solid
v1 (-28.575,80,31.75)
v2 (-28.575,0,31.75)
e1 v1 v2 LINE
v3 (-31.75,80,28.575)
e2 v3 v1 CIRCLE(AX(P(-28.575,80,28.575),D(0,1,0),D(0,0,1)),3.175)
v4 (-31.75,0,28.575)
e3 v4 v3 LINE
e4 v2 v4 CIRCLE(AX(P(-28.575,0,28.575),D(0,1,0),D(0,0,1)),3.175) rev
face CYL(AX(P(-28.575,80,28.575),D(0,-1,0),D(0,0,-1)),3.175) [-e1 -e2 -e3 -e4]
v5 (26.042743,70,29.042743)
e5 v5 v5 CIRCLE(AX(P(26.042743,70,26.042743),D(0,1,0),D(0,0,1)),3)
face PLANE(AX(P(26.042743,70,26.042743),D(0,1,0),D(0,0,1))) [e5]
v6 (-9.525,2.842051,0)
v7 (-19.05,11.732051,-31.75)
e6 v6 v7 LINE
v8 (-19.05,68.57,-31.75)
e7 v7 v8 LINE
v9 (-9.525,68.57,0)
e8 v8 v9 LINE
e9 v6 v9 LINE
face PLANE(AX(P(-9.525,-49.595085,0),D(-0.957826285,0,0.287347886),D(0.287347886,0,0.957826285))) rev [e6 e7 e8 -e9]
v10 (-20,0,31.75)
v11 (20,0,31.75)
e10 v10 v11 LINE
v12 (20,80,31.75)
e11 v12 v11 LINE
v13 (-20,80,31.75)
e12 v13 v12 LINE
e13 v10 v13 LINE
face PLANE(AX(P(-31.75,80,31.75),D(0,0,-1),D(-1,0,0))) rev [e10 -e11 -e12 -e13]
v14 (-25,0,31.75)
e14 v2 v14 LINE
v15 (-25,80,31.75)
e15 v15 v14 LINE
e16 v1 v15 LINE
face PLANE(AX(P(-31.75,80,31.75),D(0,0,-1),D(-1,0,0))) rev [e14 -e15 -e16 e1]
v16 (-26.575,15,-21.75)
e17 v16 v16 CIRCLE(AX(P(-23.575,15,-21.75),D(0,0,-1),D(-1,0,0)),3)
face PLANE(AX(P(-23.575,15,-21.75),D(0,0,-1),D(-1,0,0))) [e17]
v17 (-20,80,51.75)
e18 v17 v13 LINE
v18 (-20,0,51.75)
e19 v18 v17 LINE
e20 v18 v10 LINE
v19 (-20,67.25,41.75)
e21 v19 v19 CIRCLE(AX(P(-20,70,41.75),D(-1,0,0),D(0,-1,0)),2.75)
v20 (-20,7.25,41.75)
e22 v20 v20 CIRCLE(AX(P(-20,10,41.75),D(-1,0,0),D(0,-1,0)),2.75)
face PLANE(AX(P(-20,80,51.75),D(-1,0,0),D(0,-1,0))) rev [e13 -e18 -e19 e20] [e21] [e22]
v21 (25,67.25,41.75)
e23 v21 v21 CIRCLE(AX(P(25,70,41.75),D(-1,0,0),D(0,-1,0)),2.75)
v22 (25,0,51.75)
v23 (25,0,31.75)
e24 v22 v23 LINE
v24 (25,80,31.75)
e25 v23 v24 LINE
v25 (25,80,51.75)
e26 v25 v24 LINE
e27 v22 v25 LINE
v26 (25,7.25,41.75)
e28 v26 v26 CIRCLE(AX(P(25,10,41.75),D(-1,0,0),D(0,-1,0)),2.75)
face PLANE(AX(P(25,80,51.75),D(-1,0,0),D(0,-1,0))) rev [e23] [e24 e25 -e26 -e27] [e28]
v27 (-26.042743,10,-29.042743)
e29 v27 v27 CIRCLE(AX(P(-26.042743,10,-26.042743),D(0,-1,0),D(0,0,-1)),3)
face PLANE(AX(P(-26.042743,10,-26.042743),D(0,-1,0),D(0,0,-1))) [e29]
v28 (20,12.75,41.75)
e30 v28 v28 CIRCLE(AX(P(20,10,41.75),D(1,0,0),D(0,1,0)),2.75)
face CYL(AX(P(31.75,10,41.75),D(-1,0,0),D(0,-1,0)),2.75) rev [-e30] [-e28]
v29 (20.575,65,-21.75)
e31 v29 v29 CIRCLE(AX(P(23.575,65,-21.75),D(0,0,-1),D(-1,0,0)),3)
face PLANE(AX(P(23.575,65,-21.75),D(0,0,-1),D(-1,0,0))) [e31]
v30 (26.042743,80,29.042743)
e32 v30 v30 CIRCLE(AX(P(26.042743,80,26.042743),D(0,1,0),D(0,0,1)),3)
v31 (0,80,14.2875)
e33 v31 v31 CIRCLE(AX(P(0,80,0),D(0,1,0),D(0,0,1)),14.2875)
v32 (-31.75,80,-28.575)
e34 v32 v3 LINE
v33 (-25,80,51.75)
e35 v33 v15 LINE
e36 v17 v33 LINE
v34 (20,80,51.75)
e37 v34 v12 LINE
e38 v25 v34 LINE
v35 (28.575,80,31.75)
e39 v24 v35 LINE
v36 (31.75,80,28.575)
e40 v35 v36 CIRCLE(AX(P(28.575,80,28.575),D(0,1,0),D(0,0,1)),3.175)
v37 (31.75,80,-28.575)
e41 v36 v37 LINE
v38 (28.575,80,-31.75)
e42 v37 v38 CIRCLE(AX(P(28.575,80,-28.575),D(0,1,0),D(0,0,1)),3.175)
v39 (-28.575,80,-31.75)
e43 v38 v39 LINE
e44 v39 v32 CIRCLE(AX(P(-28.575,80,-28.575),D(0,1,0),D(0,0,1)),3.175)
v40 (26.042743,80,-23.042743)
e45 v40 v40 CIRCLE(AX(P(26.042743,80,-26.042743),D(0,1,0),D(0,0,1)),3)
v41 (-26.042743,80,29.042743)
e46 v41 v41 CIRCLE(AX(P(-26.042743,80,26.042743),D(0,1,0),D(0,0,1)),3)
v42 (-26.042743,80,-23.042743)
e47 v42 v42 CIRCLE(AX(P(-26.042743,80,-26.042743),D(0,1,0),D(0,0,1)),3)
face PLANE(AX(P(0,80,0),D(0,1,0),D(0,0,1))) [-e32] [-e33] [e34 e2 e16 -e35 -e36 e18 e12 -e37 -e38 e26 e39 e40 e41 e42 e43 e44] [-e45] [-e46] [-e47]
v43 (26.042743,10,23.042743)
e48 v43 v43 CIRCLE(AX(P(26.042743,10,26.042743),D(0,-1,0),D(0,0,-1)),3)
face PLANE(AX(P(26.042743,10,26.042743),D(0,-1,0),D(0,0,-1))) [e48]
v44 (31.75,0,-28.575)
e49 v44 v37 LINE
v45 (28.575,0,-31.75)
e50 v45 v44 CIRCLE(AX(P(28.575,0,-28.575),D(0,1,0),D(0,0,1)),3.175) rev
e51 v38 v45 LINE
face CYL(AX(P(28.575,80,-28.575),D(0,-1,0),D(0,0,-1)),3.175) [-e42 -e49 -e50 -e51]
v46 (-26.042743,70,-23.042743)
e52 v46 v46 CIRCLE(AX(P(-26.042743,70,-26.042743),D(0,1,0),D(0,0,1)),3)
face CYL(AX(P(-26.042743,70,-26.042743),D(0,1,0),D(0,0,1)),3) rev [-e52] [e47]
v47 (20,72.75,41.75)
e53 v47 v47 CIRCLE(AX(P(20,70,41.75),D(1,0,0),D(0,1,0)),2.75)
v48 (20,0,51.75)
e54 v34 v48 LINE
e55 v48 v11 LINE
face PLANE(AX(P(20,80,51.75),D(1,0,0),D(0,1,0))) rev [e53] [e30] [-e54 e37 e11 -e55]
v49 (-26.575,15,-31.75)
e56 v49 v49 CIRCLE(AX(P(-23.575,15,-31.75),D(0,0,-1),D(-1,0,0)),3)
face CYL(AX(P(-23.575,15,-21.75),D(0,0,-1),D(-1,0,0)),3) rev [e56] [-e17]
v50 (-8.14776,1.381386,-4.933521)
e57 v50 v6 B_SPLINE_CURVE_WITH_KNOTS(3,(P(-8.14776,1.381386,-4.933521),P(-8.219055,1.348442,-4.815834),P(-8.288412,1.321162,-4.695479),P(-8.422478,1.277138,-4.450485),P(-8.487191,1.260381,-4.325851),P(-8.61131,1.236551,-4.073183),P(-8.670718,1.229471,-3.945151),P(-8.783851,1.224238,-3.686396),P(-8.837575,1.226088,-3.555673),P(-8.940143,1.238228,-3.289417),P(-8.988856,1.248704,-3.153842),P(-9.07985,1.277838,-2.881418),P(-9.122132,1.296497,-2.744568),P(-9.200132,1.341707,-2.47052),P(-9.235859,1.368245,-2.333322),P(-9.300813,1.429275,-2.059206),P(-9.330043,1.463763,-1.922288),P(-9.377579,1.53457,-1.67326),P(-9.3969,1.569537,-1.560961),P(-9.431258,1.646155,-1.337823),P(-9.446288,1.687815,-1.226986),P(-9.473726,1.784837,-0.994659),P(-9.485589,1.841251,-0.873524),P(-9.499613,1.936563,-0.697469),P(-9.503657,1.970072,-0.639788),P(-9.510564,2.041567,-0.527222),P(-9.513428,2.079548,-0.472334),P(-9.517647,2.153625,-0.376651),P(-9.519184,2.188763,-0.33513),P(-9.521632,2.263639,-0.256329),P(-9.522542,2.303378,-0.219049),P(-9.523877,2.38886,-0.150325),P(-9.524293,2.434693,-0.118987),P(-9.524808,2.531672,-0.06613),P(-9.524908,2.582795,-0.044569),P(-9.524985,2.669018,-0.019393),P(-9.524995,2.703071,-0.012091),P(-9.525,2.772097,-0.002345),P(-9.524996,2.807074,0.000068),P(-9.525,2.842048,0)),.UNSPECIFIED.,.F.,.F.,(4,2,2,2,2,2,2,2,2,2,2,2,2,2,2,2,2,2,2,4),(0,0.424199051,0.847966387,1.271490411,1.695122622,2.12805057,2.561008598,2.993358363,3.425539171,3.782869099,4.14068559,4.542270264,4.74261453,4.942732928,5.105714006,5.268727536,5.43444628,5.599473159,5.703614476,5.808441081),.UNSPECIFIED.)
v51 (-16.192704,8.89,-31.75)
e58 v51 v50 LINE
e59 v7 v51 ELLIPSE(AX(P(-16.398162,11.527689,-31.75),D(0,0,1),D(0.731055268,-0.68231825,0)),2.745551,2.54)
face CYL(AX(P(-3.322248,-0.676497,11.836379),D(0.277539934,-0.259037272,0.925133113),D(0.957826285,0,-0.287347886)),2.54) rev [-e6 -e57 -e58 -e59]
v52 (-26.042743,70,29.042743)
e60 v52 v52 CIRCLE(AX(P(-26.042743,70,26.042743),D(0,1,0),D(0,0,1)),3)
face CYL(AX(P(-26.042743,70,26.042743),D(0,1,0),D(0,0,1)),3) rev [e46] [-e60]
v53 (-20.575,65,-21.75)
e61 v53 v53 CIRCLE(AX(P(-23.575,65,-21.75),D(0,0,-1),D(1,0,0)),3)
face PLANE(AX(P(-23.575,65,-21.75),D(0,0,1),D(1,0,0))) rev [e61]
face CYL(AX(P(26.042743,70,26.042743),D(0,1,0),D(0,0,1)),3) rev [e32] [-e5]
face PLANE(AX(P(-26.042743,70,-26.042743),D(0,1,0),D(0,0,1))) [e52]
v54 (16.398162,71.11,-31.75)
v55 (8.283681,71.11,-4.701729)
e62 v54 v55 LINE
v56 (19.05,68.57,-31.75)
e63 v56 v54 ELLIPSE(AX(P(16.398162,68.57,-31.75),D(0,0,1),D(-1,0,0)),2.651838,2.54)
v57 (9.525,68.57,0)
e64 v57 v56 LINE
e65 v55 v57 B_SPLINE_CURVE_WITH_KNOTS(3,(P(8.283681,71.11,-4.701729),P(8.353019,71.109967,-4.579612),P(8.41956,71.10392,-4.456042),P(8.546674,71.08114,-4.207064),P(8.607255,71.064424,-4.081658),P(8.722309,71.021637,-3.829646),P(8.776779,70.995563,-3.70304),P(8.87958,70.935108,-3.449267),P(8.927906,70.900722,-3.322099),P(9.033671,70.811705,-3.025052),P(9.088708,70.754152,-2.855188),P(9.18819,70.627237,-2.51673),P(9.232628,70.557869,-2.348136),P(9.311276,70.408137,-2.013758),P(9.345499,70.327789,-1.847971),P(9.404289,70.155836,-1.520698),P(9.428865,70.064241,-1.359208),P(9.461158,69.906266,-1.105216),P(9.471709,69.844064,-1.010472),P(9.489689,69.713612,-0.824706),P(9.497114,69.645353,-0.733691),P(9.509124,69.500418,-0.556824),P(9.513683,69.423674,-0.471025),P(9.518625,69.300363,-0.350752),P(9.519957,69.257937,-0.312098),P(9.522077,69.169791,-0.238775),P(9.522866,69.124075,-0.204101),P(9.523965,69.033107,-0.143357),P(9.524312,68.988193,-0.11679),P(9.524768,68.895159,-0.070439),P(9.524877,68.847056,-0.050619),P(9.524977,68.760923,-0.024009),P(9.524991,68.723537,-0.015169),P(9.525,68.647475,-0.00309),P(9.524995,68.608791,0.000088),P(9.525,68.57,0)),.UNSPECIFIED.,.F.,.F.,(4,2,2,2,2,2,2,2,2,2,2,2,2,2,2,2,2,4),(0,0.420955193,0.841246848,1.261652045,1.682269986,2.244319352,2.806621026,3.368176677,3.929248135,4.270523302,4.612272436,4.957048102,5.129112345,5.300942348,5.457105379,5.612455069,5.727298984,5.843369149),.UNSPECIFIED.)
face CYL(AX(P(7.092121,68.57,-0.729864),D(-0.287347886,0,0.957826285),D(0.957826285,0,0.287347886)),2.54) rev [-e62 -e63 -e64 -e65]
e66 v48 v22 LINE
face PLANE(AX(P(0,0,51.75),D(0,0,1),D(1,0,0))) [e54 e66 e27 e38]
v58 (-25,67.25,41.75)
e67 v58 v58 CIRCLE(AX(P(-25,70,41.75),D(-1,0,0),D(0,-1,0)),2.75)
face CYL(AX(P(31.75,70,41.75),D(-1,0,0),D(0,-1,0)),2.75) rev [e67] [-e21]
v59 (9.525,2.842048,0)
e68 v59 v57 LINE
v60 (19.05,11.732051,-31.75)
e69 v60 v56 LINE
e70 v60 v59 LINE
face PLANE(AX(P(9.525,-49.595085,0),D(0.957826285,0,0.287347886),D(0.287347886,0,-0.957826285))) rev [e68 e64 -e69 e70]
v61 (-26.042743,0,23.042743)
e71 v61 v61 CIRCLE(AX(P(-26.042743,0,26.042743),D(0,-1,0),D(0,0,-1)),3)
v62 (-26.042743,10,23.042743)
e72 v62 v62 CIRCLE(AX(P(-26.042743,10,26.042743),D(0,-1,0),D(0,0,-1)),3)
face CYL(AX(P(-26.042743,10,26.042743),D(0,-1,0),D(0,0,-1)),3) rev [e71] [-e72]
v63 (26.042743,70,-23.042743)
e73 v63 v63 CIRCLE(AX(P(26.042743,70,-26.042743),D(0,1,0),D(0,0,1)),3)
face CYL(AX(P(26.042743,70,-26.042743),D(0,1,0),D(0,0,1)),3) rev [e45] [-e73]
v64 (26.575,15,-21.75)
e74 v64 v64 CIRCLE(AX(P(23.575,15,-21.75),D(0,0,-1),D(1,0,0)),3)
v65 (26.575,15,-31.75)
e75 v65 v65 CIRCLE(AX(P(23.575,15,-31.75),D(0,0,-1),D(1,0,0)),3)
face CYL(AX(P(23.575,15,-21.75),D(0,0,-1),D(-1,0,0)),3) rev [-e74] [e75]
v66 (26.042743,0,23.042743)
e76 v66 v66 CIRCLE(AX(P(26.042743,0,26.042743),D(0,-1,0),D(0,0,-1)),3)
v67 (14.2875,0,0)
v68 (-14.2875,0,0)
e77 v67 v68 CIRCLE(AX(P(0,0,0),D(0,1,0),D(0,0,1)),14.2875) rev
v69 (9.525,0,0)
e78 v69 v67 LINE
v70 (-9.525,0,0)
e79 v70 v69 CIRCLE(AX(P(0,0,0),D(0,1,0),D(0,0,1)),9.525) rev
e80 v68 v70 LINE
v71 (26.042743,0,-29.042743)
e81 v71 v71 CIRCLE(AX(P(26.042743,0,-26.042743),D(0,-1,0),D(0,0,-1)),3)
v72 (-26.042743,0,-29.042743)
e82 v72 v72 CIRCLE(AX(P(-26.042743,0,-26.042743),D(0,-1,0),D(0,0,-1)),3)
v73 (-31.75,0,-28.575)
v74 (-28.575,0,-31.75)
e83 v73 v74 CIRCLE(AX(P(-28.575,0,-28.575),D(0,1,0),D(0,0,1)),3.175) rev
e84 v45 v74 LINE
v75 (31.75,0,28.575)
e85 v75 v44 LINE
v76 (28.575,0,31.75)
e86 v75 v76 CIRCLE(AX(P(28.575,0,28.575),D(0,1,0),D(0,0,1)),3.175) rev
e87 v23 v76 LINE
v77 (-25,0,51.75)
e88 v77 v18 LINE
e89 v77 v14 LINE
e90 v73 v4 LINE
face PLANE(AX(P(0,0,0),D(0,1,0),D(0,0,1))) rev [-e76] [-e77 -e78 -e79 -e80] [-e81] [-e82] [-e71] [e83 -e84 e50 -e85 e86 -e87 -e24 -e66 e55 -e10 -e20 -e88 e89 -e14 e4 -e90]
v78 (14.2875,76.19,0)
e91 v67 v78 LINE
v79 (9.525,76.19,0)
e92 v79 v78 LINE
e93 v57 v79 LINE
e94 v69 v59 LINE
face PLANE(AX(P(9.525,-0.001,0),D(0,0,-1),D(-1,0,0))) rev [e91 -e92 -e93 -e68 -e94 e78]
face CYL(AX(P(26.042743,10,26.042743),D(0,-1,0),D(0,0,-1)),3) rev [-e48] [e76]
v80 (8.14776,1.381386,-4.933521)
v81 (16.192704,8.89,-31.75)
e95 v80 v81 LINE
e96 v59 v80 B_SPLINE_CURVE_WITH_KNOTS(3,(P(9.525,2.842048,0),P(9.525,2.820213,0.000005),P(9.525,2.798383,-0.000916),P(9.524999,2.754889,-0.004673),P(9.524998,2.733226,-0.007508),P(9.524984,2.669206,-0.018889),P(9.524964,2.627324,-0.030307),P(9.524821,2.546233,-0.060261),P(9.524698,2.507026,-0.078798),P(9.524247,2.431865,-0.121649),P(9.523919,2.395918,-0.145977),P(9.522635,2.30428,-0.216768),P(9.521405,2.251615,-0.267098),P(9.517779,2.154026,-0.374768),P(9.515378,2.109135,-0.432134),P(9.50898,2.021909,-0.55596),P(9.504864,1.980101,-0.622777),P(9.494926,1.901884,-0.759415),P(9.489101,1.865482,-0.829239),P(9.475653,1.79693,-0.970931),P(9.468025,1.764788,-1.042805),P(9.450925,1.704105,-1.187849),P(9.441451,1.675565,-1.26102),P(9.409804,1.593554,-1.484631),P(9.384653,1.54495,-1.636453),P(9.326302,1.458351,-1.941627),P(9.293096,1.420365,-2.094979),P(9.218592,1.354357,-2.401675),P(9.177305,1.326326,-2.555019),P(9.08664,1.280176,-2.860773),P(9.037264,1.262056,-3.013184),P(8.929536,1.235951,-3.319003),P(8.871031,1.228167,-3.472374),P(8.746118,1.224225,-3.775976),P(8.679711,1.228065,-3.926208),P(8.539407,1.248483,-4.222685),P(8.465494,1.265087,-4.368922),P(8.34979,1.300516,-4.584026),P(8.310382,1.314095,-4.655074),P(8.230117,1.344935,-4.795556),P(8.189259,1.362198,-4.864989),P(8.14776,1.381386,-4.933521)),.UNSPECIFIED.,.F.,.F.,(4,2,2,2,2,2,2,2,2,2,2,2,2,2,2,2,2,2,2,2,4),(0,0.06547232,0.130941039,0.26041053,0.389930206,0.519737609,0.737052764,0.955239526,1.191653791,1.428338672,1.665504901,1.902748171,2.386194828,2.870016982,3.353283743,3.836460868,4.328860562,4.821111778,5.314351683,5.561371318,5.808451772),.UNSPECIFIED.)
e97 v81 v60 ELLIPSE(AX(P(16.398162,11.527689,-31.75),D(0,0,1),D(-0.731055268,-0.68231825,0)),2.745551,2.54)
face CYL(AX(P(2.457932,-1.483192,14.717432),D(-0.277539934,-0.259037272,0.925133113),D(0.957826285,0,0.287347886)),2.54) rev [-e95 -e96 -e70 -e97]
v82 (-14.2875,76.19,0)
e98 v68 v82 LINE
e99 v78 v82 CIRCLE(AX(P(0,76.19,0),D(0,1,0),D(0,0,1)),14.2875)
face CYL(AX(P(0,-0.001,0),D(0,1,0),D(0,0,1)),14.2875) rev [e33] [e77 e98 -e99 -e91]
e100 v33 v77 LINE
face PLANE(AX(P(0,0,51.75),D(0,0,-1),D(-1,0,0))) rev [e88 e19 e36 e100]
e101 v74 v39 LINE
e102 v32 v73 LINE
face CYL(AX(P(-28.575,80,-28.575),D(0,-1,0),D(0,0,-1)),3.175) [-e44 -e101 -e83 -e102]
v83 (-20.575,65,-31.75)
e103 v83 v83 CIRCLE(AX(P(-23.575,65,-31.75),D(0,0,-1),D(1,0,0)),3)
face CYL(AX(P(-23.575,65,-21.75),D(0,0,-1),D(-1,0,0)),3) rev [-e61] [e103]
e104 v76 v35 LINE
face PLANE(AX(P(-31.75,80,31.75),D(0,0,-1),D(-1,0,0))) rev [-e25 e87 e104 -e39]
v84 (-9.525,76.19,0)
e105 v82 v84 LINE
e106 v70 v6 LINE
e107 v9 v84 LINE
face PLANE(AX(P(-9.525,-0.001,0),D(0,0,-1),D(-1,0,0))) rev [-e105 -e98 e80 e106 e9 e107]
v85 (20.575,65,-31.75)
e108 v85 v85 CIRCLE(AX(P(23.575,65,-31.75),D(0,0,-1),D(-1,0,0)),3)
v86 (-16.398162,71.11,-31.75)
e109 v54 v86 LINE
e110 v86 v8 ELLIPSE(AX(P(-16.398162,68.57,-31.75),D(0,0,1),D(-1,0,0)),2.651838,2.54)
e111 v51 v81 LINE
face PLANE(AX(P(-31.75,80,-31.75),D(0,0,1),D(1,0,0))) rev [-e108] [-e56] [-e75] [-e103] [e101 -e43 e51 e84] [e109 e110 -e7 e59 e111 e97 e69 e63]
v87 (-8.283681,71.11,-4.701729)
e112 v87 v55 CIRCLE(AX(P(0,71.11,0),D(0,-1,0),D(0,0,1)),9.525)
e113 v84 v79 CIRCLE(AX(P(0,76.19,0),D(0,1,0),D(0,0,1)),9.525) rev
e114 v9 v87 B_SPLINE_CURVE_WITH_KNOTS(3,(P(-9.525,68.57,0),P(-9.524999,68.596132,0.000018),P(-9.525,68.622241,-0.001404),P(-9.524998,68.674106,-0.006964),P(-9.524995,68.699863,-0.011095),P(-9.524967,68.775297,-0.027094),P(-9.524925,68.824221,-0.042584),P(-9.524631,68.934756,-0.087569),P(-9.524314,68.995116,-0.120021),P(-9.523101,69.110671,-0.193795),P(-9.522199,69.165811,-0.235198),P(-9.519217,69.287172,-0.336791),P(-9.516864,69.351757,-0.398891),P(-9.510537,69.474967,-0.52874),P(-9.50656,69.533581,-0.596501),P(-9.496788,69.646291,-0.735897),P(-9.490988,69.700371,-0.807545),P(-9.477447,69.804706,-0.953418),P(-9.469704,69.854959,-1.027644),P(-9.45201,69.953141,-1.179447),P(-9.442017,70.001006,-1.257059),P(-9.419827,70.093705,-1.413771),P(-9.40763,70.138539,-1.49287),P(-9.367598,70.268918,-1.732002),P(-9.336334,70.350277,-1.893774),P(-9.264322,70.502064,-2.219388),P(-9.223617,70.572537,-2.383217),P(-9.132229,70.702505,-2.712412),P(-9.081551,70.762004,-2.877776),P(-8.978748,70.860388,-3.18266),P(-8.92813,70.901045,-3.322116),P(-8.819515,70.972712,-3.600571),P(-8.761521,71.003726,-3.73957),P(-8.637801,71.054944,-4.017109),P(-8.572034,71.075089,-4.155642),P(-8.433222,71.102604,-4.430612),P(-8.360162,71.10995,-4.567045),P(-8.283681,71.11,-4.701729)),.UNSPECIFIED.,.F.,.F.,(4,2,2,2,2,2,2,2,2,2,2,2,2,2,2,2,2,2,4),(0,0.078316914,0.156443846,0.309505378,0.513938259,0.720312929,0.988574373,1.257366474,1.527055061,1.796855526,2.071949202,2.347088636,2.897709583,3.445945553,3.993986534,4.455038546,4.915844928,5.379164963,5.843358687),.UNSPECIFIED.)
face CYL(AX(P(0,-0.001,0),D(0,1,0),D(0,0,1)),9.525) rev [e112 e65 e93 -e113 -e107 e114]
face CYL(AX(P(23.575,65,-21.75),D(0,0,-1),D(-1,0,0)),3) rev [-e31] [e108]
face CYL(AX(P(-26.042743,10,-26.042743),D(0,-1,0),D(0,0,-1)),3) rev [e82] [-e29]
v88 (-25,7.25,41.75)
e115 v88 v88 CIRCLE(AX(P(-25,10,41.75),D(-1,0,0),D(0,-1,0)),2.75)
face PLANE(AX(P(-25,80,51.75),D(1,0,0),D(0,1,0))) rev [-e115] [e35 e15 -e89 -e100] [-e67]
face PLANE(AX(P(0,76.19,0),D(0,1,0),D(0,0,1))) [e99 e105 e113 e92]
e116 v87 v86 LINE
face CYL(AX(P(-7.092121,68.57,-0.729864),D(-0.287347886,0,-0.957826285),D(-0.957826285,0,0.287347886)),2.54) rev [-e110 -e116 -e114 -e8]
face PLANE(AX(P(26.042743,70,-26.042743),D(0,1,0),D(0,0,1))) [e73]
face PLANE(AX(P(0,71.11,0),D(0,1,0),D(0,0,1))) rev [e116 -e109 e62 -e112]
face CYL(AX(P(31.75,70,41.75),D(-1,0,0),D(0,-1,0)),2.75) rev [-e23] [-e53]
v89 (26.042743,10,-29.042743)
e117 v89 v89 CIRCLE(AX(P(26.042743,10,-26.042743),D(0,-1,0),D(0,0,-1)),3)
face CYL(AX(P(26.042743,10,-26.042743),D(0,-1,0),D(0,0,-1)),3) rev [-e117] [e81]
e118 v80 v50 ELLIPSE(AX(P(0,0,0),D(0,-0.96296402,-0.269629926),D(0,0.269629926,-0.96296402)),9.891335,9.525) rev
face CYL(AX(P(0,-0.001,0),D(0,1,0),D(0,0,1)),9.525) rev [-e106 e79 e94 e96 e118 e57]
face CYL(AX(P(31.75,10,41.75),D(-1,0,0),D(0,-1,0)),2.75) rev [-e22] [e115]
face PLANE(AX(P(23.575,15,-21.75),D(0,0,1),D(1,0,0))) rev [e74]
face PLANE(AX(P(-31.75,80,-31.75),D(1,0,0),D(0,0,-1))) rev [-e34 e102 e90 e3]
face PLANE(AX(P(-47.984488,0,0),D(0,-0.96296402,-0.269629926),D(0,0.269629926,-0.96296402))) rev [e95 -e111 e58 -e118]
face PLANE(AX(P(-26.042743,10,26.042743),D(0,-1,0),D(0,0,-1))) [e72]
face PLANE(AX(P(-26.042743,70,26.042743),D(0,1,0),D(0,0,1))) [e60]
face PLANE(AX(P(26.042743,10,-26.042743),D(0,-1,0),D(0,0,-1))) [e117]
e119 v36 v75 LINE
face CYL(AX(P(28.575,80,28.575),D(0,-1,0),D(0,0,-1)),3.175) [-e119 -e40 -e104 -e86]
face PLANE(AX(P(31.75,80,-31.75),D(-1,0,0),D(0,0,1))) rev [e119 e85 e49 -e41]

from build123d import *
from build123d.topology import SkipClean

# Parameters (mm, degrees)
BOSS_EXTRUDE1_DEPTH            = 80
CUT_EXTRUDE1_REACH             = 93.739
FILLET1_R                      = 3.175
SKETCH4_R                      = 14.287500000000003
CUT_EXTRUDE2_DEPTH             = 3.8099999999999996
CUT_EXTRUDE3_DEPTH             = 62.22
CUT_EXTRUDE4_REACH             = 93.739
CUT_EXTRUDE4_DIRECTION_2_REACH = 93.739
FILLET2_R                      = 2.54
BOSS_EXTRUDE2_DEPTH            = 20
SKETCH10_R                     = 2.750000000000002
SKETCH10_R_2                   = 2.7500000000000018
CUT_EXTRUDE6_DEPTH             = 111.89916591210233
SKETCH11_R                     = 2.9999999999999973
SKETCH11_R_2                   = 3.0000000000000004
CUT_EXTRUDE7_DEPTH             = 10
CUT_EXTRUDE8_START             = -10
SKETCH12_R                     = 2.9999999999999973
SKETCH12_R_2                   = 3.0000000000000018
CUT_EXTRUDE8_DEPTH             = 10
SKETCH8_R                      = 3.0000000000000018
SKETCH8_R_2                    = 3.0000000000000013
CUT_EXTRUDE9_DEPTH             = 10


with BuildPart() as part:
    # Sketch2 → Boss-Extrude1 (new body)
    with BuildSketch(Plane(origin=(0, 0, 0), x_dir=(1, 0, 0), z_dir=(0, 1, 0))):
        Polygon((-31.75, 31.75), (31.749999999999993, 31.75), (31.750000000000007, -31.750000000000007), (-31.749999999999993, -31.750000000000007), align=None)
    extrude(amount=BOSS_EXTRUDE1_DEPTH)

    # Sketch3 → Cut-Extrude1 (cut, up to next)
    with BuildSketch(Plane(origin=(0, 80, 0), x_dir=(1, 0, 0), z_dir=(0, 1, 0)), mode=Mode.PRIVATE) as cut_extrude1_sk1:
        with BuildLine():
            Line((9.525, 0), (14.287500000000001, 0))
            ThreePointArc((14.287500000000001, 0), (-2.62e-15, -14.287500000000001), (-14.287500000000001, 0))
            Line((-14.287500000000001, 0), (-9.525, 0))
            ThreePointArc((-9.525, 0), (5.8e-16, 9.525), (9.525, 0))
        make_face()
    cut_extrude1_tool1 = extrude(cut_extrude1_sk1.sketch, amount=-CUT_EXTRUDE1_REACH, mode=Mode.PRIVATE) & part.part
    add(cut_extrude1_tool1.solids().sort_by_distance((0, 80, 2.954161))[0], mode=Mode.SUBTRACT)

    # Fillet1
    fillet1_edges = [part.edges().sort_by_distance(p)[0] for p in [
        (31.750000000000007, 40, 31.750000000000007),
        (-31.749999999999993, 40, 31.750000000000007),
        (-31.75, 40, -31.75),
        (31.749999999999993, 40, -31.75),
    ]]
    fillet(fillet1_edges, radius=FILLET1_R)

    # Sketch4 → Cut-Extrude2 (cut)
    with BuildSketch(Plane(origin=(0, 80, 0), x_dir=(1, 0, 0), z_dir=(0, 1, 0))):
        with Locations(Location((0, 0, 0), (0, 0, 270))):
            Circle(SKETCH4_R)
    extrude(amount=-CUT_EXTRUDE2_DEPTH, mode=Mode.SUBTRACT)

    # Sketch6 → Cut-Extrude3 (cut)
    with BuildSketch(Plane(origin=(0, 71.11000000000001, 0), x_dir=(1, 0, 0), z_dir=(0, 1, 0))):
        with BuildLine():
            Line((9.525, 0), (19.050000000000008, 31.750000000000007))
            Line((19.050000000000008, 31.750000000000007), (-19.050000000000008, 31.750000000000007))
            Line((-19.050000000000008, 31.750000000000007), (-9.525, 0))
            ThreePointArc((-9.525, 0), (5.8e-16, 9.525), (9.525, 0))
        make_face()
    extrude(amount=-CUT_EXTRUDE3_DEPTH, mode=Mode.SUBTRACT)

    # Cut-Extrude4: up to this plane
    with SkipClean():  # the faces are left unmerged after this step: merging them gives an invalid solid
        cut_extrude4_end = Plane(origin=(-9.525, -49.595085442007274, 0), z_dir=(-0.9578262852211514, 0, 0.2873478855663456))
        # Sketch7 → Cut-Extrude4 (cut, up to the surface)
        with BuildSketch(Plane(origin=(0, 0, 0), x_dir=(0, 0, -1), z_dir=(1, 0, 0)), mode=Mode.PRIVATE) as cut_extrude4_sk1:
            Polygon((0, 8.889999999999995), (31.750000000000007, 8.889999999999995), (0, 0), align=None)
        cut_extrude4_tool1 = split(extrude(cut_extrude4_sk1.sketch, amount=-CUT_EXTRUDE4_REACH, mode=Mode.PRIVATE), bisect_by=cut_extrude4_end, keep=Keep.BOTH, mode=Mode.PRIVATE)
        add(cut_extrude4_tool1.solids().sort_by_distance((0, 5.926667, -10.583333))[0], mode=Mode.SUBTRACT)

    # Cut-Extrude4 direction 2: up to this plane
    cut_extrude4_direction_2_end = Plane(origin=(9.525, -49.595085442007274, 0), z_dir=(0.9578262852211514, 0, 0.2873478855663456))
    # Sketch7 → Cut-Extrude4 direction 2 (cut, up to the surface)
    with BuildSketch(Plane(origin=(0, 0, 0), x_dir=(0, 0, -1), z_dir=(1, 0, 0)), mode=Mode.PRIVATE) as cut_extrude4_direction_2_sk1:
        Polygon((0, 8.889999999999995), (31.750000000000007, 8.889999999999995), (0, 0), align=None)
    cut_extrude4_direction_2_tool1 = split(extrude(cut_extrude4_direction_2_sk1.sketch, amount=CUT_EXTRUDE4_DIRECTION_2_REACH, mode=Mode.PRIVATE), bisect_by=cut_extrude4_direction_2_end, keep=Keep.BOTH, mode=Mode.PRIVATE)
    add(cut_extrude4_direction_2_tool1.solids().sort_by_distance((0, 5.926667, -10.583333))[0], mode=Mode.SUBTRACT)

    # Fillet2
    # the kernel refuses this fillet: 2.54 mm, written as the material it adds along each edge
    with BuildSketch(Plane(origin=(7.700340926653701, 71.11000000000001, 6.082196911154327), x_dir=(-0.9578262852211514, 0, -0.28734788556634555), z_dir=(0.28734788556634555, 0, -0.9578262852211513))) as fillet2_piece_1_section:
        with BuildLine():
            CenterArc((FILLET2_R, -FILLET2_R), FILLET2_R, 90, 90)
            Line((-5.1e-16, -FILLET2_R), (0, 0))
            Line((0, 0), (FILLET2_R, 0))
        make_face()
    fillet2_piece_1 = extrude(amount=45.84797316579104, mode=Mode.PRIVATE)
    fillet2_piece_1 = split(fillet2_piece_1, bisect_by=Plane(origin=(13.914299200637444, 70.52222392157218, -31.75), z_dir=(0, 0, 1)), keep=Keep.TOP, mode=Mode.PRIVATE)
    fillet2_piece_1 = fillet2_piece_1 - Plane(origin=(0, 70.52222392157218, 8.9e-16), x_dir=(-1, 0, -9e-17), z_dir=(0, 1, 0)) * Cylinder(9.525, 102, mode=Mode.PRIVATE)
    fillet2_piece_1 = split(fillet2_piece_1, bisect_by=Plane(origin=(13.914299200637442, 70.52222392157218, 0), z_dir=(0, 0, -1)), keep=Keep.TOP, mode=Mode.PRIVATE)
    add(fillet2_piece_1)
    with BuildSketch(Plane(origin=(-20.874659073346308, 71.11000000000001, -37.832196911154334), x_dir=(0, -1, 0), z_dir=(0.28734788556634555, 0, 0.9578262852211513))) as fillet2_piece_2_section:
        with BuildLine():
            CenterArc((FILLET2_R, FILLET2_R), FILLET2_R, 180.00000000000006, 89.99999999999994)
            Line((0, FILLET2_R), (0, 0))
            Line((0, 0), (FILLET2_R, 0))
        make_face()
    fillet2_piece_2 = extrude(amount=45.84797316579104, mode=Mode.PRIVATE)
    fillet2_piece_2 = split(fillet2_piece_2, bisect_by=Plane(origin=(-13.914332155941864, 70.52223189515664, -31.75), z_dir=(0, 0, 1)), keep=Keep.TOP, mode=Mode.PRIVATE)
    fillet2_piece_2 = split(fillet2_piece_2, bisect_by=Plane(origin=(-13.914332155941862, 70.52223189515664, 0), z_dir=(0, 0, -1)), keep=Keep.TOP, mode=Mode.PRIVATE)
    fillet2_piece_2 = fillet2_piece_2 - Plane(origin=(0, 70.52223189515664, 8.9e-16), x_dir=(-1, 0, -9e-17), z_dir=(0, 1, 0)) * Cylinder(9.525, 102, mode=Mode.PRIVATE)
    add(fillet2_piece_2)
    with BuildSketch(Plane(origin=(-20.954648618716565, 10.667672044135445, -38.09882872905519), x_dir=(0.960714101631492, 0.07483307171461931, -0.2672609704093544), z_dir=(0.2775399339309484, -0.2590372716688848, 0.9251331131031606))) as fillet2_piece_3_section:
        with BuildLine():
            CenterArc((FILLET2_R * 1.08072615035, FILLET2_R), FILLET2_R, 175.556407911294, 94.443592088706)
            Line((FILLET2_R * 0.0837320564804, FILLET2_R * 1.07747758898), (0, 0))
            Line((0, 0), (FILLET2_R * 1.08072615035, -1e-17))
        make_face()
    fillet2_piece_3 = extrude(amount=48.04460766626356, mode=Mode.PRIVATE)
    fillet2_piece_3 = split(fillet2_piece_3, bisect_by=Plane(origin=(-13.878563212714184, 5.314679557030891, -31.75), z_dir=(0, 0, 1)), keep=Keep.TOP, mode=Mode.PRIVATE)
    fillet2_piece_3 = fillet2_piece_3 - Plane(origin=(0, 5.314679557030885, 8.9e-16), x_dir=(-1, 0, -9e-17), z_dir=(0, 1, 0)) * Cylinder(9.525, 108, mode=Mode.PRIVATE)
    fillet2_piece_3 = split(fillet2_piece_3, bisect_by=Plane(origin=(-13.878563212714182, 5.314679557030885, 0), z_dir=(0, 0, -1)), keep=Keep.TOP, mode=Mode.PRIVATE)
    add(fillet2_piece_3)
    with BuildSketch(Plane(origin=(20.954648618716565, 10.667672044135447, -38.0988287290552), x_dir=(-0.9607141016314922, 0.07483307171461993, -0.2672609704093543), z_dir=(-0.2775399339309484, -0.2590372716688848, 0.9251331131031606))) as fillet2_piece_4_section:
        with BuildLine():
            CenterArc((FILLET2_R * 1.08072615035, -FILLET2_R), FILLET2_R, 90.00000000000003, 94.443592088706)
            Line((FILLET2_R * 0.0837320564804, -FILLET2_R * 1.07747758898), (0, 0))
            Line((0, 0), (FILLET2_R * 1.08072615035, 4e-17))
        make_face()
    fillet2_piece_4 = extrude(amount=48.04460766626356, mode=Mode.PRIVATE)
    fillet2_piece_4 = split(fillet2_piece_4, bisect_by=Plane(origin=(13.878545723436886, 5.3146693763951145, -31.75), z_dir=(0, 0, 1)), keep=Keep.TOP, mode=Mode.PRIVATE)
    fillet2_piece_4 = fillet2_piece_4 - Plane(origin=(0, 5.314669376395116, 8.9e-16), x_dir=(-1, 0, -9e-17), z_dir=(0, 1, 0)) * Cylinder(9.525, 108, mode=Mode.PRIVATE)
    fillet2_piece_4 = split(fillet2_piece_4, bisect_by=Plane(origin=(13.878545723436885, 5.314669376395116, 0), z_dir=(0, 0, -1)), keep=Keep.TOP, mode=Mode.PRIVATE)
    add(fillet2_piece_4)

    # Sketch9 → Boss-Extrude2 (add)
    with BuildSketch(Plane.XY.offset(31.750000000000007)):
        Polygon((-20, 80), (-25, 80), (-24.99999999999999, 0), (-19.99999999999999, -3.5e-16), align=None)
        Polygon((25.000000000000007, 80), (24.99999999999999, 0), (19.99999999999999, -3.5e-16), (20.000000000000007, 80), align=None)
    extrude(amount=BOSS_EXTRUDE2_DEPTH)

    # Sketch10 → Cut-Extrude6 (cut, through all)
    with BuildSketch(Plane.ZY.offset(24.99999999999999)):
        with Locations(Location((41.75000000000001, 70.00000000000001, 0), (0, 0, 270))):
            Circle(SKETCH10_R)
        with Locations(Location((41.750000000000014, 9.999999999999998, 0), (0, 0, 270))):
            Circle(SKETCH10_R_2)
    extrude(amount=-CUT_EXTRUDE6_DEPTH, mode=Mode.SUBTRACT)

    # Sketch11 → Cut-Extrude7 (cut)
    with BuildSketch(Plane.XZ):
        with Locations(Location((26.04274275110054, -26.04274275110054, 0), (0, 0, 270))):
            Circle(SKETCH11_R)
        with Locations(Location((26.042742751100416, 26.042742751100665, 0), (0, 0, 270))):
            Circle(SKETCH11_R)
        with Locations(Location((-26.04274275110067, -26.04274275110066, 0), (0, 0, 270))):
            Circle(SKETCH11_R_2)
        with Locations(Location((-26.042742751100786, 26.042742751100544, 0), (0, 0, 270))):
            Circle(SKETCH11_R_2)
    extrude(amount=-CUT_EXTRUDE7_DEPTH, mode=Mode.SUBTRACT)

    # Sketch12 → Cut-Extrude8 (cut)
    with BuildSketch(Plane(origin=(0, 80, 0), x_dir=(1, 0, 0), z_dir=(0, 1, 0)).offset(CUT_EXTRUDE8_START)):
        with Locations(Location((26.042742751100416, -26.042742751100665, 0), (0, 0, 90))):
            Circle(SKETCH12_R)
        with Locations(Location((26.04274275110054, 26.04274275110054, 0), (0, 0, 90))):
            Circle(SKETCH12_R)
        with Locations(Location((-26.04274275110067, 26.04274275110066, 0), (0, 0, 90))):
            Circle(SKETCH12_R_2)
        with Locations(Location((-26.042742751100786, -26.042742751100544, 0), (0, 0, 90))):
            Circle(SKETCH12_R_2)
    extrude(amount=CUT_EXTRUDE8_DEPTH, mode=Mode.SUBTRACT)

    # Sketch8 → Cut-Extrude9 (cut)
    with BuildSketch(Plane(origin=(0, 0, -31.75), x_dir=(-1, 0, 0), z_dir=(0, 0, -1))):
        with Locations((-23.574999999999985, 64.99999999999999)):
            Circle(SKETCH8_R)
        with Locations(Location((23.574999999999992, 64.99999999999999, 0), (0, 0, 180))):
            Circle(SKETCH8_R)
        with Locations((23.575, 15.000000000000014)):
            Circle(SKETCH8_R)
        with Locations(Location((-23.574999999999985, 15.000000000000009, 0), (0, 0, 180))):
            Circle(SKETCH8_R_2)
    extrude(amount=-CUT_EXTRUDE9_DEPTH, mode=Mode.SUBTRACT)


solid = part.part
